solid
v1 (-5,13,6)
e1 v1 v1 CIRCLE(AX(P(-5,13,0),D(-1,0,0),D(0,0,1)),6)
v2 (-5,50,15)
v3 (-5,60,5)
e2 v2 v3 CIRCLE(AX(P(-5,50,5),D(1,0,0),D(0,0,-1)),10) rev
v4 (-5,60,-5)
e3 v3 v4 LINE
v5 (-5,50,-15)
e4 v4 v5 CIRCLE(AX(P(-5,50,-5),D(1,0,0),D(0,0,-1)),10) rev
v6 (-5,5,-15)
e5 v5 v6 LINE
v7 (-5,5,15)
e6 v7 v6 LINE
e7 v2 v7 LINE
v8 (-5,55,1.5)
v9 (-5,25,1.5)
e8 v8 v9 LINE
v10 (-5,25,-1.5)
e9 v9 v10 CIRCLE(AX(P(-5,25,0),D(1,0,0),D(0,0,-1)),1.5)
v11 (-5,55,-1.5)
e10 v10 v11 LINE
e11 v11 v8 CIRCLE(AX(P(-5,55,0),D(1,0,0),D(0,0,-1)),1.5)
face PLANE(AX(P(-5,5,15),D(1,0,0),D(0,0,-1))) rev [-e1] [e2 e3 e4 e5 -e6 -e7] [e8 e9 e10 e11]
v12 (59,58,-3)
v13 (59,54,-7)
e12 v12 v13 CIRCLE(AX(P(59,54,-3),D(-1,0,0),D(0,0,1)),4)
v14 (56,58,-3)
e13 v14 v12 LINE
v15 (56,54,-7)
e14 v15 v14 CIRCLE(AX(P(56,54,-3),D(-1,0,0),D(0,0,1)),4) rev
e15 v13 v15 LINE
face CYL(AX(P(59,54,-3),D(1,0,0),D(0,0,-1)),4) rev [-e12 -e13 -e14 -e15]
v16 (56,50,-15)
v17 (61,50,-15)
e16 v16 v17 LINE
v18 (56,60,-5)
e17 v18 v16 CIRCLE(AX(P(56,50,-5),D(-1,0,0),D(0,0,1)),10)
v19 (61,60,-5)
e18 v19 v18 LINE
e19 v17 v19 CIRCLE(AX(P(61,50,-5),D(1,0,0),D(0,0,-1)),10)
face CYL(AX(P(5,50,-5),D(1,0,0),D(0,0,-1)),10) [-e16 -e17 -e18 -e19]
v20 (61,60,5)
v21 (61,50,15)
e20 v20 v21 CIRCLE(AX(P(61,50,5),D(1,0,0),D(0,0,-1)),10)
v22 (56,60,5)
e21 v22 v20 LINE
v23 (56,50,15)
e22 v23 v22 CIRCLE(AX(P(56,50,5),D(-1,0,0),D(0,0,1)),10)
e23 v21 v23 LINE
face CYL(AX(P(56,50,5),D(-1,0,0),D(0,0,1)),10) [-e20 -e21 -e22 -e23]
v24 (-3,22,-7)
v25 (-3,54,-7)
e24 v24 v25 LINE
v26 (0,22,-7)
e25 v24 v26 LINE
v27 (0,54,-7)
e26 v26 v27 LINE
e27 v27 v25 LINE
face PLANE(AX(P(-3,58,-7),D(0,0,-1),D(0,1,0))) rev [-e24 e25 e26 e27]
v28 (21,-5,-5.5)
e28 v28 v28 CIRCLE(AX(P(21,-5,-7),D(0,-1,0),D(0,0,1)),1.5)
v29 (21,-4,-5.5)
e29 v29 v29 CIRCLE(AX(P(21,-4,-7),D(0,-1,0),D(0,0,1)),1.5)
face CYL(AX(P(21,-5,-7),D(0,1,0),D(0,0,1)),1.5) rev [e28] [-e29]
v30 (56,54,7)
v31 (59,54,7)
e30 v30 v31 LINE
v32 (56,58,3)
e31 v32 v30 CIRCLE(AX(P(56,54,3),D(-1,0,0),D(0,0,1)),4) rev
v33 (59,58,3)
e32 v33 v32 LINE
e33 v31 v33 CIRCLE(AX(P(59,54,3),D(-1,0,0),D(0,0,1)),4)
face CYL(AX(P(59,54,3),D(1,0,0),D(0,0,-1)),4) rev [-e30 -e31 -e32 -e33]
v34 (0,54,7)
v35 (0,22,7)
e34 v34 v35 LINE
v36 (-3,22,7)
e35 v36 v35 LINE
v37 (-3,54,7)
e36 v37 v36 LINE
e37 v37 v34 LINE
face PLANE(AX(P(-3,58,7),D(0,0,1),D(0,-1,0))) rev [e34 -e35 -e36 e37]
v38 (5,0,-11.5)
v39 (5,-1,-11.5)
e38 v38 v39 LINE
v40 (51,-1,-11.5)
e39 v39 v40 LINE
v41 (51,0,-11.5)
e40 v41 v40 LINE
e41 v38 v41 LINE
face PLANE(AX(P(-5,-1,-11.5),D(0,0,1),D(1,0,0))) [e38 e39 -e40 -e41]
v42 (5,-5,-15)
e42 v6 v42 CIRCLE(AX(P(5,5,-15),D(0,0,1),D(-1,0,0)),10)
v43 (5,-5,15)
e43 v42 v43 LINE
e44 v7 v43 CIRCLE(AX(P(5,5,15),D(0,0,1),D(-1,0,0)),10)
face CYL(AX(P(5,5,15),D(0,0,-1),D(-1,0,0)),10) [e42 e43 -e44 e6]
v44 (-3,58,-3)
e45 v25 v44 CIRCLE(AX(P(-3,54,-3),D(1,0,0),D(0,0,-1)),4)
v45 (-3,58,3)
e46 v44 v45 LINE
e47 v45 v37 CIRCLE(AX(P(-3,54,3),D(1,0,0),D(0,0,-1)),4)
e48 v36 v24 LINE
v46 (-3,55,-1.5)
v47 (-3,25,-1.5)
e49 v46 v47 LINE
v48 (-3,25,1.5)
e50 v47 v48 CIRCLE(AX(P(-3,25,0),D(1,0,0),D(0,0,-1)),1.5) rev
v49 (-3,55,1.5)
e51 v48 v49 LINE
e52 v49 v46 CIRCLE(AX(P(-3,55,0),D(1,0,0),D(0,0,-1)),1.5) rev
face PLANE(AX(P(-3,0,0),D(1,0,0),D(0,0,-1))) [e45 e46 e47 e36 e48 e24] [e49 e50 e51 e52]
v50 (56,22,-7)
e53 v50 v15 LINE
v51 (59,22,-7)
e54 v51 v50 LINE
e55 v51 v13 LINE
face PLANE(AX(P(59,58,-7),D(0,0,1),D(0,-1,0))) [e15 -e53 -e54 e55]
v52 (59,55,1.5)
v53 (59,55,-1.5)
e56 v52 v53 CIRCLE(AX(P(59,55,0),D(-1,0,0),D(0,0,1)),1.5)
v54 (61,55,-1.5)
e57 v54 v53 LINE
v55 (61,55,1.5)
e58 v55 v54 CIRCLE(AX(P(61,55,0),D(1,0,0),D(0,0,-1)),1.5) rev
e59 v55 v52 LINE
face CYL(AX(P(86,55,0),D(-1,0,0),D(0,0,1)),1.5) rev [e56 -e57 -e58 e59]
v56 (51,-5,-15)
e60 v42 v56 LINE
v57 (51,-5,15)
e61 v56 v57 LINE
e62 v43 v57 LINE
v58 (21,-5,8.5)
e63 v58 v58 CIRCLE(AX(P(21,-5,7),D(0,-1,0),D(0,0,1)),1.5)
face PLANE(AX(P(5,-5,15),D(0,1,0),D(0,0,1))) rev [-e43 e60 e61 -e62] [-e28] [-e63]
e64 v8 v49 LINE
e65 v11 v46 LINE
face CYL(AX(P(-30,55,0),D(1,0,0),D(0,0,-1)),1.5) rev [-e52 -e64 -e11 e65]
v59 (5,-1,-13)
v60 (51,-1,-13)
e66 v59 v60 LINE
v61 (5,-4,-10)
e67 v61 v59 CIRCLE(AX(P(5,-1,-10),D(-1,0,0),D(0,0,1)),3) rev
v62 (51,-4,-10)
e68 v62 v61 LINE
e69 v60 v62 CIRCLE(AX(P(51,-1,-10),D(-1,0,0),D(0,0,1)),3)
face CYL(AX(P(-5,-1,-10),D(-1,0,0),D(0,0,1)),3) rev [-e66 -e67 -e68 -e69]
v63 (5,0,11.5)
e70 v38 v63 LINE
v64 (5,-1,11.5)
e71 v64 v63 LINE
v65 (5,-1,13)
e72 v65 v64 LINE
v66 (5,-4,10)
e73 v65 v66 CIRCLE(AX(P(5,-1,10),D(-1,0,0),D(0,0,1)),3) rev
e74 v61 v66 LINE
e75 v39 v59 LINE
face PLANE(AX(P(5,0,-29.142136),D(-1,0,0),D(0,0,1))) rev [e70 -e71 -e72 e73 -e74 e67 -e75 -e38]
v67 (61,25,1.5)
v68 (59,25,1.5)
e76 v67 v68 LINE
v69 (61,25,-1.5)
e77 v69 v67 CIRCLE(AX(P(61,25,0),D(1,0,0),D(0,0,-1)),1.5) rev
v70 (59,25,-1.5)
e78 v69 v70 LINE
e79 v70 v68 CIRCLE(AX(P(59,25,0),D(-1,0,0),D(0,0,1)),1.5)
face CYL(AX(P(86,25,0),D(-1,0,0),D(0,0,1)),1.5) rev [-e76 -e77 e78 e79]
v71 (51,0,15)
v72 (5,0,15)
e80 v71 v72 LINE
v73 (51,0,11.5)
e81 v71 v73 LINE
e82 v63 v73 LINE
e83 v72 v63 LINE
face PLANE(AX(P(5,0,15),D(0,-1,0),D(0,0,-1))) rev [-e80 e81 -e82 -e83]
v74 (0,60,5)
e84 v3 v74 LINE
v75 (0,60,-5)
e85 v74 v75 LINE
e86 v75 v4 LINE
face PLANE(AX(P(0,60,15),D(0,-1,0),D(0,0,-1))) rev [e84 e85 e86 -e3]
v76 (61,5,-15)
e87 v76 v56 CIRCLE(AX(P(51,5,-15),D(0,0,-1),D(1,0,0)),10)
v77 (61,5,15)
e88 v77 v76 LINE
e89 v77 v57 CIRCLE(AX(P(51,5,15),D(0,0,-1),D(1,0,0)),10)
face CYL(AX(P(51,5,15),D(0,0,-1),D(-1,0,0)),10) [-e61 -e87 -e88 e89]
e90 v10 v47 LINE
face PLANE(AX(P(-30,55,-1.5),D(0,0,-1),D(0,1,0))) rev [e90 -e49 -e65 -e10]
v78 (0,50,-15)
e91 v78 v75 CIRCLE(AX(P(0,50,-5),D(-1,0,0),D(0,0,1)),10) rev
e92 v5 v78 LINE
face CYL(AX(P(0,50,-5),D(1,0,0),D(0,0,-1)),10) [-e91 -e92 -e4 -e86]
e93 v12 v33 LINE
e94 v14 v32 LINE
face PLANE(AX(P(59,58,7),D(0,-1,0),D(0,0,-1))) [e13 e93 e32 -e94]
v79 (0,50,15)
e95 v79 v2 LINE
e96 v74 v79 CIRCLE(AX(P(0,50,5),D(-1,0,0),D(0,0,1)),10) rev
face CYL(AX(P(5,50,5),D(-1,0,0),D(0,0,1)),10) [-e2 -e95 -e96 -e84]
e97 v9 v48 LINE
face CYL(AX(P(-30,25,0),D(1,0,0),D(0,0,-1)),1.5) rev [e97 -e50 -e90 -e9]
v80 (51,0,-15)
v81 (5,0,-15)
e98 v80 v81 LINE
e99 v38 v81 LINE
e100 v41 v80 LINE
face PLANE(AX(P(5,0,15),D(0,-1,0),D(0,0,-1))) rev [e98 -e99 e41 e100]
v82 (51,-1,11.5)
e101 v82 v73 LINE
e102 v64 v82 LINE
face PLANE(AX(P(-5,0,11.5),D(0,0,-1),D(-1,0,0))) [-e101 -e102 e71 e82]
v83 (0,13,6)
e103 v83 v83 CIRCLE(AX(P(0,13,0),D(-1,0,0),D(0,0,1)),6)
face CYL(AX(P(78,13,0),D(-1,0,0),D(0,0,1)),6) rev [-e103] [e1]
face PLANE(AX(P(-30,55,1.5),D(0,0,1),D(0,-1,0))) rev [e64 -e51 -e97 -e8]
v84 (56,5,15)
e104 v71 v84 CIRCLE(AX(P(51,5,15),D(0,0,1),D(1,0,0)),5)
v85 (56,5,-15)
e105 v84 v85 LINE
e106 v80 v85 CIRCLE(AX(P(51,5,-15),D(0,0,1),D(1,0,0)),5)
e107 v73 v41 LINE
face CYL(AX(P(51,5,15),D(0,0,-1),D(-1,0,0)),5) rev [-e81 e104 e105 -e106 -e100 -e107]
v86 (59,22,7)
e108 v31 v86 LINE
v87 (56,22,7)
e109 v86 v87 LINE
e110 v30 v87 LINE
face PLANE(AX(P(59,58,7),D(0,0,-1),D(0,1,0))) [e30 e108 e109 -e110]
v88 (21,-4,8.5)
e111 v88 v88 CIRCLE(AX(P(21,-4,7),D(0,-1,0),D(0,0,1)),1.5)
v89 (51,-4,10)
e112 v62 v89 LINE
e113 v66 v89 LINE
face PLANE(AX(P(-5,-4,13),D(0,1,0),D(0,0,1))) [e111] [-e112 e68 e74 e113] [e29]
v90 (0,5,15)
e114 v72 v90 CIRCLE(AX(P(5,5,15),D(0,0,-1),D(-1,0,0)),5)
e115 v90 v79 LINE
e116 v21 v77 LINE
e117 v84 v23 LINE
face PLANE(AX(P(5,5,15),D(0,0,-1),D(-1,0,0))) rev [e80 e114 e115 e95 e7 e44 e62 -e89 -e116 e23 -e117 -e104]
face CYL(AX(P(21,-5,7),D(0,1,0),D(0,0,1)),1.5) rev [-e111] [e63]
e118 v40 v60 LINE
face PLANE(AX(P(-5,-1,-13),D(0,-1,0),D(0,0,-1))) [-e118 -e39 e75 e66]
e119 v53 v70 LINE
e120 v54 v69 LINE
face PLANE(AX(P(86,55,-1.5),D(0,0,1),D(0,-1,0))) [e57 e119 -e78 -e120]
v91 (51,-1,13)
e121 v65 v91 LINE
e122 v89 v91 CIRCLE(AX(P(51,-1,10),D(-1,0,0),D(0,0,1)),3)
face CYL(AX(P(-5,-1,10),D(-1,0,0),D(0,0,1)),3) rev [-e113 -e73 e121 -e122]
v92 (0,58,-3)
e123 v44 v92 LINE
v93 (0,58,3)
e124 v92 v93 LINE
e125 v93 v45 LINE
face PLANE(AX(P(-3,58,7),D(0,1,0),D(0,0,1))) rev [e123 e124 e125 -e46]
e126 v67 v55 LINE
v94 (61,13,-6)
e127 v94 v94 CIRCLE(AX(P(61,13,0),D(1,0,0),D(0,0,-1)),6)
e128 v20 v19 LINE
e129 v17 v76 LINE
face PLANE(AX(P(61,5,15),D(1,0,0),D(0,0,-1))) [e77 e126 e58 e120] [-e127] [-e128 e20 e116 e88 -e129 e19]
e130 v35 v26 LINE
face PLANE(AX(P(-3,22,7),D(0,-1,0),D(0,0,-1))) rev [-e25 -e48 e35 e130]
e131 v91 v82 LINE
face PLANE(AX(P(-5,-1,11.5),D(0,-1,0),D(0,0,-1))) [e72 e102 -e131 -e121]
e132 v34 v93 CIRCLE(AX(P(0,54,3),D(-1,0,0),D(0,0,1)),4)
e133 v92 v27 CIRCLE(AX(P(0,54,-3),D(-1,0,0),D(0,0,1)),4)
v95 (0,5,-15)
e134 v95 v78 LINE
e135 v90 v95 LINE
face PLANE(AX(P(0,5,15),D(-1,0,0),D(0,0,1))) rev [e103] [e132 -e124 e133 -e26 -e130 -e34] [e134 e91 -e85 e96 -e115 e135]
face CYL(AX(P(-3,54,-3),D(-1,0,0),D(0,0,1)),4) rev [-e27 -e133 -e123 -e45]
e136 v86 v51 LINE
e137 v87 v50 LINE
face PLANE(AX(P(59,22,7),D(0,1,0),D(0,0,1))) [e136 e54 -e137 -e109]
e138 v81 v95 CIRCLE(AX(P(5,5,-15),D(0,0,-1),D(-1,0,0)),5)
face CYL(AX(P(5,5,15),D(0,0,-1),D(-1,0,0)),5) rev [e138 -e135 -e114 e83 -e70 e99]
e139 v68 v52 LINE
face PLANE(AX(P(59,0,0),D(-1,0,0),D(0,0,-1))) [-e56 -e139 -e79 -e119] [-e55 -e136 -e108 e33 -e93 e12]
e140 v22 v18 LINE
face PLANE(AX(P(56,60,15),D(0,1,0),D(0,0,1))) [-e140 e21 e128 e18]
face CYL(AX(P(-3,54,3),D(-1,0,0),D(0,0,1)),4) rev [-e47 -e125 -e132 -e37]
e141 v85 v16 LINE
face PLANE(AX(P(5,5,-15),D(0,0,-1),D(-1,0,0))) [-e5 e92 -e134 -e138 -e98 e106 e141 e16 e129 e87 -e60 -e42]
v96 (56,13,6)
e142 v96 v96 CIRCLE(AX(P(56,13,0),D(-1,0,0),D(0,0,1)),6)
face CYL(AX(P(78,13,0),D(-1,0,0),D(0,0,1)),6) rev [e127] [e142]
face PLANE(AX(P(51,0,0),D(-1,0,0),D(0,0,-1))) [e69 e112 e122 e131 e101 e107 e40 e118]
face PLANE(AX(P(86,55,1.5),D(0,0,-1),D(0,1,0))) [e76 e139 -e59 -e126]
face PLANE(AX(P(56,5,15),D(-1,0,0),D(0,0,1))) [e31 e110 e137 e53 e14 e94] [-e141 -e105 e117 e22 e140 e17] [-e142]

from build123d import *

# Parameters (mm, degrees)
BOSS_EXTRUDE1_DEPTH   = 15
CUT_EXTRUDE1_DEPTH    = 30
SKETCH5_W             = 14
SKETCH5_H             = 36
CUT_EXTRUDE2_DEPTH    = 3
SKETCH7_R             = 1.5
CUT_EXTRUDE3_DEPTH    = 90
MIRROR1_START         = -4
MIRROR1_DEPTH         = 9
MIRROR1_START_2       = 56
MIRROR1_2_OUTLINE_W   = 60
MIRROR1_2_OUTLINE_H   = 30
MIRROR1_2_OUTLINE_W_2 = 36
MIRROR1_2_OUTLINE_H_2 = 14
MIRROR1_2_DEPTH       = 3
MIRROR1_START_3       = 59
MIRROR1_3_OUTLINE_W   = 36
MIRROR1_3_OUTLINE_H   = 14
MIRROR1_3_DEPTH       = 2
MIRROR1_4_DEPTH       = 9
MIRROR1_START_4       = 51
MIRROR1_5_DEPTH       = 4.358898944
MIRROR1_START_5       = 22.5000001
MIRROR1_6_DEPTH       = 28.4999999
MIRROR1_START_6       = -15
MIRROR1_7_OUTLINE_W   = 2
MIRROR1_7_OUTLINE_H   = 2
MIRROR1_7_DEPTH       = 30
MIRROR1_8_OUTLINE_W   = 2
MIRROR1_8_OUTLINE_H   = 36
MIRROR1_8_DEPTH       = 8
MIRROR1_START_7       = 7
MIRROR1_9_OUTLINE_W   = 2
MIRROR1_9_OUTLINE_H   = 36
MIRROR1_9_DEPTH       = 8
MIRROR1_START_8       = -6
MIRROR1_10_OUTLINE_R  = 1.5
MIRROR1_10_DEPTH      = 3
CUT_EXTRUDE5_START    = -70
CUT_EXTRUDE5_DEPTH    = 70
BOSS_EXTRUDE2_START   = -28
BOSS_EXTRUDE2_DEPTH   = 26
FILLET1_R             = 10
FILLET2_R             = 4
FILLET3_R             = 3
SKETCH9_R             = 6
CUT_EXTRUDE6_DEPTH    = 83


with BuildPart() as part:
    # Sketch1 → Boss-Extrude1 (new, symmetric)
    with BuildSketch(Plane.XY):
        with BuildLine():
            Line((5, 0), (60, 0))
            Line((60, 0), (60, -5))
            Line((60, -5), (5, -5))
            ThreePointArc((5, -5), (-2.071067812, -2.071067812), (-5, 5))
            Line((-5, 5), (-5, 60))
            Line((-5, 60), (0, 60))
            Line((0, 60), (0, 5))
            ThreePointArc((0, 5), (1.464466094, 1.464466094), (5, 0))
        make_face()
    extrude(amount=BOSS_EXTRUDE1_DEPTH, both=True)

    # Cut-Sweep1: sweep along a path in Sketch3
    with BuildLine(Plane(origin=(0, 0, 0), x_dir=(1, 0, 0), z_dir=(0, 1, 0))) as cut_sweep1_path:
        Line((60, 0), (5, 0))
    # Sketch2 → Cut-Sweep1 (sweep, cut)
    with BuildSketch(Plane(origin=(60, 0, 0), x_dir=(0, 0, -1), z_dir=(1, 0, 0))):
        Polygon((-11.5, 0), (-11.5, -1), (-13, -1), (-13, -4), (13, -4), (13, -1), (11.5, -1), (11.5, 0), align=None)
    sweep(path=cut_sweep1_path.line, mode=Mode.SUBTRACT)

    # Sketch4 → Cut-Extrude1 (cut)
    with BuildSketch(Plane(origin=(0, 0, 0), x_dir=(0, 0, -1), z_dir=(1, 0, 0))):
        with BuildLine():
            Line((1.5, 55), (1.5, 25))
            ThreePointArc((1.5, 25), (0, 23.5), (-1.5, 25))
            Line((-1.5, 25), (-1.5, 55))
            ThreePointArc((-1.5, 55), (0, 56.5), (1.5, 55))
        make_face()
    extrude(amount=-CUT_EXTRUDE1_DEPTH, mode=Mode.SUBTRACT)

    # Sketch5 → Cut-Extrude2 (cut)
    with BuildSketch(Plane(origin=(0, 0, 0), x_dir=(0, 0, -1), z_dir=(1, 0, 0))):
        with Locations((0, 40)):
            Rectangle(SKETCH5_W, SKETCH5_H)
    extrude(amount=-CUT_EXTRUDE2_DEPTH, mode=Mode.SUBTRACT)

    # Sketch7 → Cut-Extrude3 (cut, through all)
    with BuildSketch(Plane(origin=(0, -4, 0), x_dir=(1, 0, 0), z_dir=(0, 1, 0))):
        with Locations(Location((35, 7, 0), (0, 0, 270))):
            Circle(SKETCH7_R)
        with Locations(Location((35, -7, 0), (0, 0, 270))):
            Circle(SKETCH7_R)
    extrude(amount=-CUT_EXTRUDE3_DEPTH, mode=Mode.SUBTRACT)

    # Mirror1: read off the stored shape, not the designer's step
    # Mirror1 outline → Mirror1 (cut)
    with BuildSketch(Plane.YZ.offset(MIRROR1_START)):
        Polygon((0, -11.5), (0, 11.5), (-1, 11.5), (-1, 13), (-4, 13), (-4, -13), (-1, -13), (-1, -11.5), align=None)
    extrude(amount=MIRROR1_DEPTH, mode=Mode.SUBTRACT)

    # Mirror1 2 outline → Mirror1 2 (add)
    with BuildSketch(Plane.YZ.offset(MIRROR1_START_2)):
        with Locations((30, 0)):
            Rectangle(MIRROR1_2_OUTLINE_W, MIRROR1_2_OUTLINE_H)
        with Locations((40, 0)):
            Rectangle(MIRROR1_2_OUTLINE_W_2, MIRROR1_2_OUTLINE_H_2, mode=Mode.SUBTRACT)
    extrude(amount=MIRROR1_2_DEPTH)

    # Mirror1 3 outline → Mirror1 3 (add)
    with BuildSketch(Plane.YZ.offset(MIRROR1_START_3)):
        with Locations((40, 0)):
            Rectangle(MIRROR1_3_OUTLINE_W, MIRROR1_3_OUTLINE_H)
        with BuildLine():
            Line((25, 1.5), (55, 1.5))
            ThreePointArc((55, 1.5), (56.5, 0), (55, -1.5))
            Line((55, -1.5), (25, -1.5))
            ThreePointArc((25, -1.5), (23.5, 0), (25, 1.5))
        make_face(mode=Mode.SUBTRACT)
    extrude(amount=MIRROR1_3_DEPTH)

    # Mirror1 4 outline → Mirror1 4 (add)
    with BuildSketch(Plane.YZ.offset(MIRROR1_START)):
        Polygon((-1, 11.5), (0, 11.5), (0, 15), (-5, 15), (-5, -15), (0, -15), (0, -11.5), (-1, -11.5), (-1, -13), (-4, -13), (-4, 13), (-1, 13), align=None)
    extrude(amount=MIRROR1_4_DEPTH)

    # Mirror1 5 outline → Mirror1 5 (add)
    with BuildSketch(Plane.YZ.offset(MIRROR1_START_4)):
        Polygon((0, -11.5), (0, 11.5), (-1, 11.5), (-1, 13), (-4, 13), (-4, -13), (-1, -13), (-1, -11.5), align=None)
    extrude(amount=MIRROR1_5_DEPTH)

    # Mirror1 6 outline → Mirror1 6 (add)
    with BuildSketch(Plane.YZ.offset(MIRROR1_START_5)):
        Polygon((-1, 11.5), (0, 11.5), (0, 15), (-5, 15), (-5, -15), (0, -15), (0, -11.5), (-1, -11.5), (-1, -13), (-4, -13), (-4, 13), (-1, 13), align=None)
    extrude(amount=MIRROR1_6_DEPTH)

    # Mirror1 7 outline → Mirror1 7 (add)
    with BuildSketch(Plane.XY.offset(MIRROR1_START_6)):
        with BuildLine():
            Line((56, 0), (56, 5))
            ThreePointArc((56, 5), (54.535533906, 1.464466094), (51, 0))
            Line((51, 0), (55.358898944, 0))
            Line((55.358898944, 0), (55.358898944, -4))
            ThreePointArc((55.358898944, -4), (59.473163206, -0.310885546), (61, 5))
            Line((61, 5), (61, 22))
            Line((61, 22), (59, 22))
            Line((59, 22), (59, 0))
            Line((59, 0), (56, 0))
        make_face()
        with Locations((60, 59)):
            Rectangle(MIRROR1_7_OUTLINE_W, MIRROR1_7_OUTLINE_H)
    extrude(amount=MIRROR1_7_DEPTH)

    # Mirror1 8 outline → Mirror1 8 (add)
    with BuildSketch(Plane.XY.offset(MIRROR1_START_6)):
        with Locations((60, 40)):
            Rectangle(MIRROR1_8_OUTLINE_W, MIRROR1_8_OUTLINE_H)
    extrude(amount=MIRROR1_8_DEPTH)

    # Mirror1 9 outline → Mirror1 9 (add)
    with BuildSketch(Plane.XY.offset(MIRROR1_START_7)):
        with Locations((60, 40)):
            Rectangle(MIRROR1_9_OUTLINE_W, MIRROR1_9_OUTLINE_H)
    extrude(amount=MIRROR1_9_DEPTH)

    # Mirror1 10 outline → Mirror1 10 (cut)
    with BuildSketch(Plane(origin=(0, 0, 0), x_dir=(1, 0, 0), z_dir=(0, 1, 0)).offset(MIRROR1_START_8)):
        with Locations((21, -7)):
            Circle(MIRROR1_10_OUTLINE_R)
        with Locations((21, 7)):
            Circle(MIRROR1_10_OUTLINE_R)
    extrude(amount=MIRROR1_10_DEPTH, mode=Mode.SUBTRACT)

    # Sketch8 → Cut-Extrude5 (cut)
    with BuildSketch(Plane.XY.offset(15).offset(CUT_EXTRUDE5_START)):
        with BuildLine():
            Line((65.755683461, 5), (61, 5))
            ThreePointArc((61, 5), (60.659258263, 2.411809549), (59.660254038, 0))
            Line((59.660254038, 0), (60, 0))
            Line((60, 0), (60, -5))
            Line((60, -5), (51, -5))
            Line((51, -5), (51, -9.755683461))
            ThreePointArc((51, -9.755683461), (61.433843836, -5.433843836), (65.755683461, 5))
        make_face()
        with BuildLine():
            ThreePointArc((59.660254038, 0), (56, -3.660254038), (51, -5))
            Line((51, -5), (60, -5))
            Line((60, -5), (60, 0))
            Line((60, 0), (59.660254038, 0))
        make_face()
        with BuildLine():
            Line((-4, -5), (5, -5))
            ThreePointArc((5, -5), (0, -3.660254038), (-3.660254038, 0))
            Line((-3.660254038, 0), (-4, 0))
            Line((-4, 0), (-4, -5))
        make_face()
    extrude(amount=CUT_EXTRUDE5_DEPTH, mode=Mode.SUBTRACT)

    # Sketch8<3> → Boss-Extrude2 (add)
    with BuildSketch(Plane.XY.offset(15).offset(BOSS_EXTRUDE2_START)):
        with BuildLine():
            ThreePointArc((-3.660254038, 0), (0, -3.660254038), (5, -5))
            Line((5, -5), (5, 0))
            ThreePointArc((5, 0), (1.464466094, 1.464466094), (0, 5))
            Line((0, 5), (-5, 5))
            ThreePointArc((-5, 5), (-4.659258263, 2.411809549), (-3.660254038, 0))
        make_face()
    extrude(amount=BOSS_EXTRUDE2_DEPTH)

    # Fillet1
    fillet1_edges = [part.edges().sort_by_distance(p)[0] for p in [
        (58.5, 60, -15),
        (58.5, 60, 15),
        (-2.5, 60, 15),
        (-2.5, 60, -15),
    ]]
    fillet(fillet1_edges, radius=FILLET1_R)

    # Fillet2
    fillet2_edges = [part.edges().sort_by_distance(p)[0] for p in [
        (57.5, 58, 7),
        (57.5, 58, -7),
        (-1.5, 58, 7),
        (-1.5, 58, -7),
    ]]
    fillet(fillet2_edges, radius=FILLET2_R)

    # Fillet3
    fillet3_edges = [part.edges().sort_by_distance(p)[0] for p in [
        (28, -4, 13),
        (28, -4, -13),
    ]]
    fillet(fillet3_edges, radius=FILLET3_R - 0.0001)  # a hair under: the kernel refuses the full size

    # Sketch9 → Cut-Extrude6 (cut)
    with BuildSketch(Plane.ZY.offset(5)):
        with Locations((0, 13)):
            Circle(SKETCH9_R)
    extrude(amount=-CUT_EXTRUDE6_DEPTH, mode=Mode.SUBTRACT)


solid = part.part
